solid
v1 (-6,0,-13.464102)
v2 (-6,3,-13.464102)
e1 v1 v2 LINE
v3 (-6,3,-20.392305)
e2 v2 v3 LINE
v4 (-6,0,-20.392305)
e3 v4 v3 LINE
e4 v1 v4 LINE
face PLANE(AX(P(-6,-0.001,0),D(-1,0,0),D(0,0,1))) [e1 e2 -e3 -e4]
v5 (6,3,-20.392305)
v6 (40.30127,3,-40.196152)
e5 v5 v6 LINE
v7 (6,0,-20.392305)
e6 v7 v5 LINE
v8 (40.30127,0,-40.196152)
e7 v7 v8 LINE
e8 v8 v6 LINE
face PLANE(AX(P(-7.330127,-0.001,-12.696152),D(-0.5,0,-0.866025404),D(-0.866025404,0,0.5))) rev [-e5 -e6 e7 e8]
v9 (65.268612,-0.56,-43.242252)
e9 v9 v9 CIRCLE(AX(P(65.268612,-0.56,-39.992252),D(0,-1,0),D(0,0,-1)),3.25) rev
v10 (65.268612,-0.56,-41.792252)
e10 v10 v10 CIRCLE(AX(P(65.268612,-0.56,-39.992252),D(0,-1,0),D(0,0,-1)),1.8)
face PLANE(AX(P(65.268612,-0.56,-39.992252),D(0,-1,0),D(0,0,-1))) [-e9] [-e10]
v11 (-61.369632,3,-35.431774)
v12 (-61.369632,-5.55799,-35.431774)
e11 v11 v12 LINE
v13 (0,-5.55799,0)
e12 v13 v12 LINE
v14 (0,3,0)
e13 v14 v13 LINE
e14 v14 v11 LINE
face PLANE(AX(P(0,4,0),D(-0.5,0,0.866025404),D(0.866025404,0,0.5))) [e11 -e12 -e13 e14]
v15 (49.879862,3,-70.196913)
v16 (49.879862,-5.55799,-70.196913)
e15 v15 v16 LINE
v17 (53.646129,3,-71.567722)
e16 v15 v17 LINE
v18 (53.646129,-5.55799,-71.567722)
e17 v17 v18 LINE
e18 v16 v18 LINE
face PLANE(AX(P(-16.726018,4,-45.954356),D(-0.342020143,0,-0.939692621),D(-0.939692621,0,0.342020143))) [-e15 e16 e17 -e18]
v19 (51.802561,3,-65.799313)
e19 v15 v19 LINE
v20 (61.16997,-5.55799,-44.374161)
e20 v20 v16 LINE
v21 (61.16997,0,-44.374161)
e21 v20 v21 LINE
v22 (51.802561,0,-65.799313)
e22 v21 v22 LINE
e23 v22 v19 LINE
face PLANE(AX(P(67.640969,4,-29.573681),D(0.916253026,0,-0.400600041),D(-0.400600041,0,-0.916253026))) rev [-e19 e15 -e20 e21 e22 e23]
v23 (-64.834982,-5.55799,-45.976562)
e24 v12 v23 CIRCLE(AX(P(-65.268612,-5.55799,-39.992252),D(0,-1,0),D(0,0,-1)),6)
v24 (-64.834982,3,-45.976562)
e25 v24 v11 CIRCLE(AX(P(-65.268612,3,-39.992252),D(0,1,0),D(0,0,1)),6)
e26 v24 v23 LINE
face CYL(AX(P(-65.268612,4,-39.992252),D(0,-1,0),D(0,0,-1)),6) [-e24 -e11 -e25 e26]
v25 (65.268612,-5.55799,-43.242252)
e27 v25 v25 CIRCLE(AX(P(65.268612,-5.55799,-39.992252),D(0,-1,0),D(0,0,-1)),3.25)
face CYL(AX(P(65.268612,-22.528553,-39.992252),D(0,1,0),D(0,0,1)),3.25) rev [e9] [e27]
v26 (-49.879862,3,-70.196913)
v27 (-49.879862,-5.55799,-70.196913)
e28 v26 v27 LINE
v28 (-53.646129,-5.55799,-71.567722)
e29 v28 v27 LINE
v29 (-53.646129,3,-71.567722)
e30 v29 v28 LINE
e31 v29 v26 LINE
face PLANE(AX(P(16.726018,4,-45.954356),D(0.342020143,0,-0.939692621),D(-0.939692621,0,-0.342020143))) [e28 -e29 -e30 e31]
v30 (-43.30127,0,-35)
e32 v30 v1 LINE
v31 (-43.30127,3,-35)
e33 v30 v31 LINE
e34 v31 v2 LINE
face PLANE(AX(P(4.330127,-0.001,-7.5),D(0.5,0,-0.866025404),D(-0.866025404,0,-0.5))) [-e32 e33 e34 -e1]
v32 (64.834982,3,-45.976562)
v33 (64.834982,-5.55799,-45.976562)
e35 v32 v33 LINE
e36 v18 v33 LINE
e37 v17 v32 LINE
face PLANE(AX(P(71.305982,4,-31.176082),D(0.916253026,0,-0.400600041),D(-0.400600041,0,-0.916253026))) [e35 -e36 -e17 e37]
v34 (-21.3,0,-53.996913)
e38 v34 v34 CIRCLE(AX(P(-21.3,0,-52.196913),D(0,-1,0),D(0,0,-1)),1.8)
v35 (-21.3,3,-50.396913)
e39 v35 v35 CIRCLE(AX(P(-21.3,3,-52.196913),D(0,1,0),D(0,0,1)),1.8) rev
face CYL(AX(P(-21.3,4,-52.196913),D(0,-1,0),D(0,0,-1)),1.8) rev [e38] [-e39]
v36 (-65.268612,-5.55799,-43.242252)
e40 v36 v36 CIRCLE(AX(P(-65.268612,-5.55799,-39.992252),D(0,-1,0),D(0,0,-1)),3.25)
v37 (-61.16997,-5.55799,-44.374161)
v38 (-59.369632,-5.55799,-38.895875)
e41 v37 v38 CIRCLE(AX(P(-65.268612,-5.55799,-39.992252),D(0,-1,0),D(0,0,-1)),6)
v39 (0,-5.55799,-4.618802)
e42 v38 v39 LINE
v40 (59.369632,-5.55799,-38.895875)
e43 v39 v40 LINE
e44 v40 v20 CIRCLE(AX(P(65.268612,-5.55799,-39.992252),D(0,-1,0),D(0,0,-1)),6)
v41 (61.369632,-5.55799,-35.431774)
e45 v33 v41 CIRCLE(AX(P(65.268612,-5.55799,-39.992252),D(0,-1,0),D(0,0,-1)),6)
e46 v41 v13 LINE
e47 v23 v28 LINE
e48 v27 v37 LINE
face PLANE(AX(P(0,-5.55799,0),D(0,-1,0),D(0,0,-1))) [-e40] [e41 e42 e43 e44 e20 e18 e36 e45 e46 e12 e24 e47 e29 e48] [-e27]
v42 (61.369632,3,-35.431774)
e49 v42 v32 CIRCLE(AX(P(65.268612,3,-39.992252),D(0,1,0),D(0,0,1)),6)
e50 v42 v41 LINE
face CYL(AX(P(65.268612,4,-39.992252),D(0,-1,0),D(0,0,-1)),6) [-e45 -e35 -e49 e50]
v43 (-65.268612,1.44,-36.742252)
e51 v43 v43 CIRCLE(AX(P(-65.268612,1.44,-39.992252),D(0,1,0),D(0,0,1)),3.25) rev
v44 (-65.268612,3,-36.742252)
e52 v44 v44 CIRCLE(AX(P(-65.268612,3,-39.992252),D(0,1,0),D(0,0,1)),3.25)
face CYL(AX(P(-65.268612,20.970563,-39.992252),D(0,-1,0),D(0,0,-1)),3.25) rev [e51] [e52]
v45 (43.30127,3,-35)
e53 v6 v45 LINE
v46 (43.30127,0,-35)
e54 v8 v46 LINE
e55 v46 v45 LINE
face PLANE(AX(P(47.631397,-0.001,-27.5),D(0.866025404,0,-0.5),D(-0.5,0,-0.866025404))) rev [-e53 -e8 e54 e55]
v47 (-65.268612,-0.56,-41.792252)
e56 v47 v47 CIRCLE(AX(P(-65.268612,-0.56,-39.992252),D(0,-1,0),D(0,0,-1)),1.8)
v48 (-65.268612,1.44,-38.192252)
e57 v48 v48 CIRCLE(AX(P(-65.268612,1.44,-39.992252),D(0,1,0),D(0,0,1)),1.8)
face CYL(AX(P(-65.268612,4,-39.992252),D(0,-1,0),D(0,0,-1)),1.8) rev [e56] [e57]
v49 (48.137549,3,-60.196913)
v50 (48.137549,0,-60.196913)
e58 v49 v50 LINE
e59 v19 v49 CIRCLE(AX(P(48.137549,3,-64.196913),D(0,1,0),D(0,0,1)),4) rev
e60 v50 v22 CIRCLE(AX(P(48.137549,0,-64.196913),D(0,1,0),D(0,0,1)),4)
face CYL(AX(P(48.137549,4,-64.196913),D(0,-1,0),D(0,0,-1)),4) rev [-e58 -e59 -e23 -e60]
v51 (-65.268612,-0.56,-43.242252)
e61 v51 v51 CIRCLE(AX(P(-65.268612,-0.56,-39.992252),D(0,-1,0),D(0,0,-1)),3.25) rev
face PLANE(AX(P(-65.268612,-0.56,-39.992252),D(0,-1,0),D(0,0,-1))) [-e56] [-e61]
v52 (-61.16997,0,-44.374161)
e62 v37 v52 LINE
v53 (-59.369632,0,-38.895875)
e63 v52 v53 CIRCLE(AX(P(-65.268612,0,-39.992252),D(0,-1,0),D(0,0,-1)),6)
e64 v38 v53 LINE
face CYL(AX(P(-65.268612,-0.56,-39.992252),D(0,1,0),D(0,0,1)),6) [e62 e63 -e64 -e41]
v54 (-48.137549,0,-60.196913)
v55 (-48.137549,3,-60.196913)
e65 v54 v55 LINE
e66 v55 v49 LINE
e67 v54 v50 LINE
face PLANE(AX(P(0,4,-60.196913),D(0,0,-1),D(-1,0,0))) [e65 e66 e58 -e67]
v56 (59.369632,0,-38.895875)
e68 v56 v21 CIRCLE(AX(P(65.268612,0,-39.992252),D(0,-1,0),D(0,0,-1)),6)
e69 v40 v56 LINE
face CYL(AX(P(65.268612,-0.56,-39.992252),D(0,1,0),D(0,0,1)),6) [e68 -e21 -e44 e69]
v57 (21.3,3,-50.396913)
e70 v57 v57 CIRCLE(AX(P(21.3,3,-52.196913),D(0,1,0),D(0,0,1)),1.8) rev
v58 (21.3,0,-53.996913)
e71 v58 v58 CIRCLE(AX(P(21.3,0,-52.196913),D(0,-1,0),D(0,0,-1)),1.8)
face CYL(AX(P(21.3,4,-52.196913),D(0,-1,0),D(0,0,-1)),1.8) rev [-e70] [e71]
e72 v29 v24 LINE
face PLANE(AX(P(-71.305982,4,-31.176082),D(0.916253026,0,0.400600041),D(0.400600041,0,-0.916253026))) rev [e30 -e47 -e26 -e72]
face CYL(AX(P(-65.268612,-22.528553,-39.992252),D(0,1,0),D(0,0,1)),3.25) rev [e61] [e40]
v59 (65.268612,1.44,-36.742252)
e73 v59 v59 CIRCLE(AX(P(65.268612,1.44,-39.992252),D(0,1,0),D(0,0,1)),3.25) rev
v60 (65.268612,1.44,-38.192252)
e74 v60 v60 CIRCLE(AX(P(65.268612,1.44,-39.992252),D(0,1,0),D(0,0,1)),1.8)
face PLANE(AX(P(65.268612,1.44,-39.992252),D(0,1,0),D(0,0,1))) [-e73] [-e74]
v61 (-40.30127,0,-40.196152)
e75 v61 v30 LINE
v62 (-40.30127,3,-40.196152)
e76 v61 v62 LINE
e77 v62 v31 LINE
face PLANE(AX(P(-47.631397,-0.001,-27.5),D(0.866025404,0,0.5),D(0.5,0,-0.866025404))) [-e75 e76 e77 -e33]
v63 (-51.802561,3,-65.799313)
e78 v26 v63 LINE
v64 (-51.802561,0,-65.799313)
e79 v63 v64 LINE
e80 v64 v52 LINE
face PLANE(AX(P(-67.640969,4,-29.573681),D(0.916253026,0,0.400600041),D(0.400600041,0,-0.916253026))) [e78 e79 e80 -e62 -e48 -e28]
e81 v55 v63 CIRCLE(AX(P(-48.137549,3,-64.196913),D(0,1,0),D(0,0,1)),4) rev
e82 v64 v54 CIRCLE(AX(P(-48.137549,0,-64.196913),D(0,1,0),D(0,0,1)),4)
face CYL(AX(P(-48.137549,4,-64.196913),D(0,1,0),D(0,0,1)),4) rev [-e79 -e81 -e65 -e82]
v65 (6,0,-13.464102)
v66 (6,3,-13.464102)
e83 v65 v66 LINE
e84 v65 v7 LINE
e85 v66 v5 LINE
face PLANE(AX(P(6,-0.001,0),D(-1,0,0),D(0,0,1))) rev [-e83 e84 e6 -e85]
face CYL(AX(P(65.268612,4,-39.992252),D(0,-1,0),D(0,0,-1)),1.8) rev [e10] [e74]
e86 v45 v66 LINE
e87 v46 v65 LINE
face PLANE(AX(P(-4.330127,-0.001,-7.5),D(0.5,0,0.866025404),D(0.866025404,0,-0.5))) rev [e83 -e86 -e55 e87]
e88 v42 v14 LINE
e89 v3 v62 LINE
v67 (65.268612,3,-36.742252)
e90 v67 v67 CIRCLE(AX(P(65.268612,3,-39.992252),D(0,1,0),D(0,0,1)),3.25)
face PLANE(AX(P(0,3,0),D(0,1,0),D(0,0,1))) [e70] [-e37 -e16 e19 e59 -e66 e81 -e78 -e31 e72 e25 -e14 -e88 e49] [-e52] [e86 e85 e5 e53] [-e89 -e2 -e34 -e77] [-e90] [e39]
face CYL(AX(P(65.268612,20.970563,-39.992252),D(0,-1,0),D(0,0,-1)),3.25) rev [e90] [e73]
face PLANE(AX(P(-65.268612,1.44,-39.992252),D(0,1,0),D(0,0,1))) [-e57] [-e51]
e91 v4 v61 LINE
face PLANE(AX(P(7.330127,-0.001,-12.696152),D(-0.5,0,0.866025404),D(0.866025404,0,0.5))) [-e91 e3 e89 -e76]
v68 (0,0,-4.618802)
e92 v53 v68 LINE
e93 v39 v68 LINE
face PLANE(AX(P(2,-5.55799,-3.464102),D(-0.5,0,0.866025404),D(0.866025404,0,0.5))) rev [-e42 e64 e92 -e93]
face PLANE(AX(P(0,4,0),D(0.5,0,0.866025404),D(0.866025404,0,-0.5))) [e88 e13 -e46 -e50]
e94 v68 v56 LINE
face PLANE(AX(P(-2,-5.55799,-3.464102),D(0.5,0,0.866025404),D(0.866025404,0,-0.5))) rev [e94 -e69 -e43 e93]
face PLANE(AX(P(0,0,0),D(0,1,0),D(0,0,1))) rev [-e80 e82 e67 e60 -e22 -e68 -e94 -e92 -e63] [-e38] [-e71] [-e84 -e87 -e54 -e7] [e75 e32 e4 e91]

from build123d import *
from build123d.topology import SkipClean

# Parameters (mm, degrees)
SKETCH1_R           = 1.8
BOSS_EXTRUDE1_DEPTH = 4
FILLET1_R           = 4
CUT_EXTRUDE2_REACH  = 103.08
BOSS_EXTRUDE3_START = 5.55799
BOSS_EXTRUDE3_DEPTH = 5.55799
SKETCH6_R           = 1.8
CUT_EXTRUDE3_DEPTH  = 102.153572382
BOSS_EXTRUDE6_START = 0.56
SKETCH17_R          = 6
SKETCH17_R_2        = 1.8
BOSS_EXTRUDE6_DEPTH = 0.56
CUT_EXTRUDE13_START = -2.56
SKETCH18_R          = 6
SKETCH18_R_2        = 1.8
CUT_EXTRUDE13_DEPTH = 2.56
BOSS_EXTRUDE7_START = 4.99799
SKETCH19_R          = 6
SKETCH19_R_2        = 3.25
BOSS_EXTRUDE7_DEPTH = 4.99799
SKETCH20_R          = 6
SKETCH20_R_2        = 3.25
BOSS_EXTRUDE8_DEPTH = 2.56
SKETCH21_W          = 180.141886337
SKETCH21_H          = 87.597084555
CUT_EXTRUDE14_DEPTH = 1


with BuildPart() as part:
    # Sketch1 → Boss-Extrude1 (new body)
    with BuildSketch(Plane(origin=(0, 0, 0), x_dir=(1, 0, 0), z_dir=(0, 1, 0))):
        with BuildLine():
            Line((-61.369632465, 35.431773824), (0, 0))
            Line((0, 0), (61.369632465, 35.431773824))
            ThreePointArc((61.369632465, 35.431773824), (70.968700885, 38.119022954), (64.834981957, 45.97656166))
            Line((64.834981957, 45.97656166), (53.646129321, 71.567722497))
            Line((53.646129321, 71.567722497), (49.879862047, 70.196913315))
            Line((49.879862047, 70.196913315), (54.252017225, 60.196913315))
            Line((54.252017225, 60.196913315), (-54.252017225, 60.196913315))
            Line((-54.252017225, 60.196913315), (-49.879862047, 70.196913315))
            Line((-49.879862047, 70.196913315), (-53.646129321, 71.567722497))
            Line((-53.646129321, 71.567722497), (-64.834981957, 45.97656166))
            ThreePointArc((-64.834981957, 45.97656166), (-70.968700885, 38.119022954), (-61.369632465, 35.431773824))
        make_face()
        with Locations(Location((-65.268611951, 39.992251756, 0), (0, 0, 270))):
            Circle(SKETCH1_R, mode=Mode.SUBTRACT)
        with Locations(Location((65.268611951, 39.992251756, 0), (0, 0, 270))):
            Circle(SKETCH1_R, mode=Mode.SUBTRACT)
    extrude(amount=BOSS_EXTRUDE1_DEPTH)

    # Fillet1
    fillet1_edges = [part.edges().sort_by_distance(p)[0] for p in [
        (-54.252017225, 2, -60.196913315),
        (54.252017225, 2, -60.196913315),
    ]]
    fillet(fillet1_edges, radius=FILLET1_R)

    # Sketch4 → Cut-Extrude2 (cut, up to next)
    with BuildSketch(Plane(origin=(0, 4, 0), x_dir=(1, 0, 0), z_dir=(0, 1, 0)), mode=Mode.PRIVATE) as cut_extrude2_sk1:
        Polygon((6, 13.464101615), (43.301270189, 35), (40.301270189, 40.196152423), (6, 20.392304845), align=None)
    cut_extrude2_tool1 = extrude(cut_extrude2_sk1.sketch, amount=-CUT_EXTRUDE2_REACH, mode=Mode.PRIVATE) & part.part
    # Sketch4 → Cut-Extrude2 (cut, up to next)
    with BuildSketch(Plane(origin=(0, 4, 0), x_dir=(1, 0, 0), z_dir=(0, 1, 0)), mode=Mode.PRIVATE) as cut_extrude2_sk2:
        Polygon((-43.301270189, 35), (-6, 13.464101615), (-6, 20.392304845), (-40.301270189, 40.196152423), align=None)
    cut_extrude2_tool2 = extrude(cut_extrude2_sk2.sketch, amount=-CUT_EXTRUDE2_REACH, mode=Mode.PRIVATE) & part.part
    add(cut_extrude2_tool1.solids().sort_by_distance((23.91111, 4, -27.220808))[0], mode=Mode.SUBTRACT)
    add(cut_extrude2_tool2.solids().sort_by_distance((-23.91111, 4, -27.220808))[0], mode=Mode.SUBTRACT)

    # Sketch5 → Boss-Extrude3 (add)
    with BuildSketch(Plane.XZ.offset(BOSS_EXTRUDE3_START)):
        with BuildLine():
            Line((-64.834981957, -45.97656166), (-53.646129321, -71.567722497))
            Line((-53.646129321, -71.567722497), (-49.879862047, -70.196913315))
            Line((-49.879862047, -70.196913315), (-51.802560936, -65.79931348))
            Line((-51.802560936, -65.79931348), (-61.169969855, -44.374161496))
            ThreePointArc((-61.169969855, -44.374161496), (-62.865011704, -45.48976991), (-64.834981957, -45.97656166))
        make_face()
        with BuildLine():
            ThreePointArc((-61.369632465, -35.431773824), (-60.072459528, -36.992251756), (-59.369632465, -38.895875439))
            Line((-59.369632465, -38.895875439), (0, -4.618802154))
            Line((0, -4.618802154), (59.369632465, -38.895875439))
            ThreePointArc((59.369632465, -38.895875439), (60.072459528, -36.992251756), (61.369632465, -35.431773824))
            Line((61.369632465, -35.431773824), (0, 0))
            Line((0, 0), (-61.369632465, -35.431773824))
        make_face()
        with BuildLine():
            ThreePointArc((64.834981957, -45.97656166), (62.865011704, -45.48976991), (61.169969855, -44.374161496))
            Line((61.169969855, -44.374161496), (51.802560936, -65.79931348))
            Line((51.802560936, -65.79931348), (49.879862047, -70.196913315))
            Line((49.879862047, -70.196913315), (53.646129321, -71.567722497))
            Line((53.646129321, -71.567722497), (64.834981957, -45.97656166))
        make_face()
    extrude(amount=-BOSS_EXTRUDE3_DEPTH)

    # Sketch6 → Cut-Extrude3 (cut, through all)
    with BuildSketch(Plane.XZ):
        with Locations(Location((-21.3, -52.196913315, 0), (0, 0, 270))):
            Circle(SKETCH6_R)
        with Locations(Location((21.3, -52.196913315, 0), (0, 0, 270))):
            Circle(SKETCH6_R)
    extrude(amount=-CUT_EXTRUDE3_DEPTH, mode=Mode.SUBTRACT)

    # Sketch17 → Boss-Extrude6 (add)
    # profile 1 of 2: a face of its own
    with BuildSketch(Plane.XZ.offset(BOSS_EXTRUDE6_START)):
        with Locations((65.268611951, -39.992251756)):
            Circle(SKETCH17_R)
        with Locations(Location((65.268611951, -39.992251756, 0), (0, 0, 270))):
            Circle(SKETCH17_R_2, mode=Mode.SUBTRACT)
    # profile 2 of 2: a face of its own
    with BuildSketch(Plane.XZ.offset(BOSS_EXTRUDE6_START)):
        with Locations((-65.268611951, -39.992251756)):
            Circle(SKETCH17_R)
        with Locations(Location((-65.268611951, -39.992251756, 0), (0, 0, 270))):
            Circle(SKETCH17_R_2, mode=Mode.SUBTRACT)
    extrude(amount=-BOSS_EXTRUDE6_DEPTH)

    # Sketch18 → Cut-Extrude13 (cut)
    # profile 1 of 2: a face of its own
    with BuildSketch(Plane(origin=(0, 4, 0), x_dir=(1, 0, 0), z_dir=(0, 1, 0)).offset(CUT_EXTRUDE13_START)):
        with Locations((-65.268611951, 39.992251756)):
            Circle(SKETCH18_R)
        with Locations(Location((-65.268611951, 39.992251756, 0), (0, 0, 90))):
            Circle(SKETCH18_R_2, mode=Mode.SUBTRACT)
    # profile 2 of 2: a face of its own
    with BuildSketch(Plane(origin=(0, 4, 0), x_dir=(1, 0, 0), z_dir=(0, 1, 0)).offset(CUT_EXTRUDE13_START)):
        with Locations((65.268611951, 39.992251756)):
            Circle(SKETCH18_R)
        with Locations(Location((65.268611951, 39.992251756, 0), (0, 0, 90))):
            Circle(SKETCH18_R_2, mode=Mode.SUBTRACT)
    extrude(amount=CUT_EXTRUDE13_DEPTH, mode=Mode.SUBTRACT)

    # Sketch19 → Boss-Extrude7 (add)
    # profile 1 of 2: a face of its own
    with BuildSketch(Plane.XZ.offset(0.56).offset(BOSS_EXTRUDE7_START)):
        with Locations((-65.268611951, -39.992251756)):
            Circle(SKETCH19_R)
        with Locations(Location((-65.268611951, -39.992251756, 0), (0, 0, 270))):
            Circle(SKETCH19_R_2, mode=Mode.SUBTRACT)
    # profile 2 of 2: a face of its own
    with BuildSketch(Plane.XZ.offset(0.56).offset(BOSS_EXTRUDE7_START)):
        with Locations((65.268611951, -39.992251756)):
            Circle(SKETCH19_R)
        with Locations(Location((65.268611951, -39.992251756, 0), (0, 0, 270))):
            Circle(SKETCH19_R_2, mode=Mode.SUBTRACT)
    extrude(amount=-BOSS_EXTRUDE7_DEPTH)

    # Sketch20 → Boss-Extrude8 (add)
    # profile 1 of 2: a face of its own
    with BuildSketch(Plane(origin=(0, 1.44, 0), x_dir=(1, 0, 0), z_dir=(0, 1, 0))):
        with Locations((-65.268611951, 39.992251756)):
            Circle(SKETCH20_R)
        with Locations(Location((-65.268611951, 39.992251756, 0), (0, 0, 90))):
            Circle(SKETCH20_R_2, mode=Mode.SUBTRACT)
    # profile 2 of 2: a face of its own
    with BuildSketch(Plane(origin=(0, 1.44, 0), x_dir=(1, 0, 0), z_dir=(0, 1, 0))):
        with Locations((65.268611951, 39.992251756)):
            Circle(SKETCH20_R)
        with Locations(Location((65.268611951, 39.992251756, 0), (0, 0, 90))):
            Circle(SKETCH20_R_2, mode=Mode.SUBTRACT)
    extrude(amount=BOSS_EXTRUDE8_DEPTH)

    # Sketch21 → Cut-Extrude14 (cut)
    with SkipClean():  # the faces are left unmerged after this step: merging them gives an invalid solid
        with BuildSketch(Plane(origin=(0, 4, 0), x_dir=(1, 0, 0), z_dir=(0, 1, 0))):
            with Locations((-2.136514257, 36.289877784)):
                Rectangle(SKETCH21_W, SKETCH21_H)
        extrude(amount=-CUT_EXTRUDE14_DEPTH, mode=Mode.SUBTRACT)


solid = part.part
